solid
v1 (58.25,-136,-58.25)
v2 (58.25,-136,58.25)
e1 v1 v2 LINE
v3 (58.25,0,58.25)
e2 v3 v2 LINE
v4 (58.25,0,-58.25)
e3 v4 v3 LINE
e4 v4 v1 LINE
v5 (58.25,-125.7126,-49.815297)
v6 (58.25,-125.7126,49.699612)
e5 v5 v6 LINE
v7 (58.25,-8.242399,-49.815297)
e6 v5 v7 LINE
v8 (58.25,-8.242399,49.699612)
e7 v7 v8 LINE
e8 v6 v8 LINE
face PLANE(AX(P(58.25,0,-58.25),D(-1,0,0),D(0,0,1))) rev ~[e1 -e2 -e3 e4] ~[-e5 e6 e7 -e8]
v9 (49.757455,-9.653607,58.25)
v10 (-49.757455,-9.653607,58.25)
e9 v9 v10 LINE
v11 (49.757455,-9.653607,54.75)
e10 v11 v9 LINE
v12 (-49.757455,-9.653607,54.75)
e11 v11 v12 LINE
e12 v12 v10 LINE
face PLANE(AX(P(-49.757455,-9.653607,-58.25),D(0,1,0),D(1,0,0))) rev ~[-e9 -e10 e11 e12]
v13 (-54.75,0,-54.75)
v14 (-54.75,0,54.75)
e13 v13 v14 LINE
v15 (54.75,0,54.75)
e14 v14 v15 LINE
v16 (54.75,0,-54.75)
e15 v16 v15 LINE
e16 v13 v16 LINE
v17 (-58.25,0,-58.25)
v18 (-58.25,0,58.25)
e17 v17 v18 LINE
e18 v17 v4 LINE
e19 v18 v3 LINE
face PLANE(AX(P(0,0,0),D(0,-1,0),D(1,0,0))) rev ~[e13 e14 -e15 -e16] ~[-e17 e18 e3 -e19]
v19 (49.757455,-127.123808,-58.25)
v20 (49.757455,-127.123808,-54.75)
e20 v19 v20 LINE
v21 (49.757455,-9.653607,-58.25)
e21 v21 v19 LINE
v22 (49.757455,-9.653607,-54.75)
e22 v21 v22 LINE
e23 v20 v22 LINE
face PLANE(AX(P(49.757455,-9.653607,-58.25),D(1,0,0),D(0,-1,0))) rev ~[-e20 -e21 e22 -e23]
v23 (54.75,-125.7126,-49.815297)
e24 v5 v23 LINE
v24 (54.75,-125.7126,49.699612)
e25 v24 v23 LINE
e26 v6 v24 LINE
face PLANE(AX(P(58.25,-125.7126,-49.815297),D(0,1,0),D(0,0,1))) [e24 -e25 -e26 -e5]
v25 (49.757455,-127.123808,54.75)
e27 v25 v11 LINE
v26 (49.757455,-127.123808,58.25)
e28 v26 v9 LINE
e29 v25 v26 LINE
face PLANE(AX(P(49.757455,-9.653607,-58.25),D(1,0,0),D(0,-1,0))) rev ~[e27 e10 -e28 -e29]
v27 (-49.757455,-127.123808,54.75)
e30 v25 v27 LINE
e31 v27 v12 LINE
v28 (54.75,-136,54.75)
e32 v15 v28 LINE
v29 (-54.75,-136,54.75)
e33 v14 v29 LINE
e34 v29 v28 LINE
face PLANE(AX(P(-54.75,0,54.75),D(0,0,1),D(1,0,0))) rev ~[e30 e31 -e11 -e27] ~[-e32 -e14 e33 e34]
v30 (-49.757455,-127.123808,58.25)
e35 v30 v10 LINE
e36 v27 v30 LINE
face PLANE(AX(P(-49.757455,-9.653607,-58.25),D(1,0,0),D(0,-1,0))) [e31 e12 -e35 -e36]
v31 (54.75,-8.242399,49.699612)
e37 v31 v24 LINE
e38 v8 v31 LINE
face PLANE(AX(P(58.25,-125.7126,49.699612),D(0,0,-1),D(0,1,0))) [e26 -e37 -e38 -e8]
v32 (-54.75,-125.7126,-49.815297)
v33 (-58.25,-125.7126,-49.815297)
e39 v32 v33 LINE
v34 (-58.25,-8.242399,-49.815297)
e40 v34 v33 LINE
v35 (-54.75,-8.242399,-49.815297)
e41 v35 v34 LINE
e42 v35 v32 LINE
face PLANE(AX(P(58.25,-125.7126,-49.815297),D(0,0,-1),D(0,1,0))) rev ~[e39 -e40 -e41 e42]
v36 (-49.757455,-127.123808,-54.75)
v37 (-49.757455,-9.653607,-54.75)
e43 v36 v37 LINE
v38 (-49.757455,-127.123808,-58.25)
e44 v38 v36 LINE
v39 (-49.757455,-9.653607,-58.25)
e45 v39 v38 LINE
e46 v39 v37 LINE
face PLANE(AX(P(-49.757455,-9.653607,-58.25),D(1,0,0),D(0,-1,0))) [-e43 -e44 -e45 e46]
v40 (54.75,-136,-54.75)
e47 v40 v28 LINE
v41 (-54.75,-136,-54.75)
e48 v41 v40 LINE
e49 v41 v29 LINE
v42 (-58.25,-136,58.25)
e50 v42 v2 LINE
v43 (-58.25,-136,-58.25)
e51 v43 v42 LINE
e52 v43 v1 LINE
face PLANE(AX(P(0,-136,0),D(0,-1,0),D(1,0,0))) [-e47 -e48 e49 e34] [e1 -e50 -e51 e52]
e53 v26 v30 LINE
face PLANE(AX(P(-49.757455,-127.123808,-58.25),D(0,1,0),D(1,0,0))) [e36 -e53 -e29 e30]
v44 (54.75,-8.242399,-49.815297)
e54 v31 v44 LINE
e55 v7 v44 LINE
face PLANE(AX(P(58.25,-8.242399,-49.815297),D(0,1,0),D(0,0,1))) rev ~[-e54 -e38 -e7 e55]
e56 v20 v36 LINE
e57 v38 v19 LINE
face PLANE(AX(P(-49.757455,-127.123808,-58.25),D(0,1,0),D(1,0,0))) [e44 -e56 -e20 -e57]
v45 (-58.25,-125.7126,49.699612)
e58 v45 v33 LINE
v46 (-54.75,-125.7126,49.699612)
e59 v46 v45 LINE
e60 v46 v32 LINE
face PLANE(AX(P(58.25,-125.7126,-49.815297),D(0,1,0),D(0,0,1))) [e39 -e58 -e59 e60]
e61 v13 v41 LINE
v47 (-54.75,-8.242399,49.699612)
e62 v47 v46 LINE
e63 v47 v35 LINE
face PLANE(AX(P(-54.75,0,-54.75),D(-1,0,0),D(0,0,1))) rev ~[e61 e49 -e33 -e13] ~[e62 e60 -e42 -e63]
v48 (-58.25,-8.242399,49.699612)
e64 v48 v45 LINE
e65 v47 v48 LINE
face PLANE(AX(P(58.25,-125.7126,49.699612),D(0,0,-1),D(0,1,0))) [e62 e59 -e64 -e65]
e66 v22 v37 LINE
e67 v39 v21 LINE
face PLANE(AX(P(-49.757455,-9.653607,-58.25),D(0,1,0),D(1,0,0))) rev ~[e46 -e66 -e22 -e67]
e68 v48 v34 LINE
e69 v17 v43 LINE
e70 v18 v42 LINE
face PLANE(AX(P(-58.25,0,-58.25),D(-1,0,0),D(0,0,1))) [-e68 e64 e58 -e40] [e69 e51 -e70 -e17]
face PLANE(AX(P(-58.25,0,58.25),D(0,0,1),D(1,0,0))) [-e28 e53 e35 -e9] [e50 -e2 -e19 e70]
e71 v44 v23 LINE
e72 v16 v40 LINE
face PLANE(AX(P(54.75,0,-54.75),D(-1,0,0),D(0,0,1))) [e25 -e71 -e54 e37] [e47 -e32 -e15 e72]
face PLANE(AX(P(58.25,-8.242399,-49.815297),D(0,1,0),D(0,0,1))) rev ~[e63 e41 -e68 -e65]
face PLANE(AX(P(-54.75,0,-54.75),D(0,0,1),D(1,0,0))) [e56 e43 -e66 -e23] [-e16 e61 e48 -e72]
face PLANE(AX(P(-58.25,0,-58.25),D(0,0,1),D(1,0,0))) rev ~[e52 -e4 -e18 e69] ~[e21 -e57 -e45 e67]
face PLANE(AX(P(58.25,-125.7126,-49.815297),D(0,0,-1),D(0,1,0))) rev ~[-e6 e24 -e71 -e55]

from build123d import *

# Parameters (mm, degrees)
F0_W     = 116.5
F0_H     = 116.5
F0_W_2   = 109.5
F0_H_2   = 109.5
F1_DEPTH = 136
F2_W     = 99.5149090886
F2_H     = 117.4702011049
F3_DEPTH = 186
F4_W     = 117.4702011049
F4_H     = 99.5149090886
F5_DEPTH = 134.2


# Not quite as in the source:
# - a feature of the source that left no trace in its solid (it failed there, or was rolled back) is left out


with BuildPart() as f1:
    # F0 (on Front) → F1 (new body)
    with BuildSketch(Plane.XZ):
        Rectangle(F0_W, F0_H)
        Rectangle(F0_W_2, F0_H_2, mode=Mode.SUBTRACT)
    extrude(amount=F1_DEPTH)

    # F2 (on face) → F3 (cut)
    with BuildSketch(Plane(origin=(0, 0, -58.25), x_dir=(1, 0, 0), z_dir=(0, 0, -1))):
        with Locations((0, 68.3887079358)):
            Rectangle(F2_W, F2_H)
    extrude(amount=-F3_DEPTH, mode=Mode.SUBTRACT)

    # F4 (on face) → F5 (cut)
    with BuildSketch(Plane.YZ.offset(58.25)):
        with Locations((-66.9774990529, -0.0578425825)):
            Rectangle(F4_W, F4_H)
    extrude(amount=-F5_DEPTH, mode=Mode.SUBTRACT)


solid = f1.part
